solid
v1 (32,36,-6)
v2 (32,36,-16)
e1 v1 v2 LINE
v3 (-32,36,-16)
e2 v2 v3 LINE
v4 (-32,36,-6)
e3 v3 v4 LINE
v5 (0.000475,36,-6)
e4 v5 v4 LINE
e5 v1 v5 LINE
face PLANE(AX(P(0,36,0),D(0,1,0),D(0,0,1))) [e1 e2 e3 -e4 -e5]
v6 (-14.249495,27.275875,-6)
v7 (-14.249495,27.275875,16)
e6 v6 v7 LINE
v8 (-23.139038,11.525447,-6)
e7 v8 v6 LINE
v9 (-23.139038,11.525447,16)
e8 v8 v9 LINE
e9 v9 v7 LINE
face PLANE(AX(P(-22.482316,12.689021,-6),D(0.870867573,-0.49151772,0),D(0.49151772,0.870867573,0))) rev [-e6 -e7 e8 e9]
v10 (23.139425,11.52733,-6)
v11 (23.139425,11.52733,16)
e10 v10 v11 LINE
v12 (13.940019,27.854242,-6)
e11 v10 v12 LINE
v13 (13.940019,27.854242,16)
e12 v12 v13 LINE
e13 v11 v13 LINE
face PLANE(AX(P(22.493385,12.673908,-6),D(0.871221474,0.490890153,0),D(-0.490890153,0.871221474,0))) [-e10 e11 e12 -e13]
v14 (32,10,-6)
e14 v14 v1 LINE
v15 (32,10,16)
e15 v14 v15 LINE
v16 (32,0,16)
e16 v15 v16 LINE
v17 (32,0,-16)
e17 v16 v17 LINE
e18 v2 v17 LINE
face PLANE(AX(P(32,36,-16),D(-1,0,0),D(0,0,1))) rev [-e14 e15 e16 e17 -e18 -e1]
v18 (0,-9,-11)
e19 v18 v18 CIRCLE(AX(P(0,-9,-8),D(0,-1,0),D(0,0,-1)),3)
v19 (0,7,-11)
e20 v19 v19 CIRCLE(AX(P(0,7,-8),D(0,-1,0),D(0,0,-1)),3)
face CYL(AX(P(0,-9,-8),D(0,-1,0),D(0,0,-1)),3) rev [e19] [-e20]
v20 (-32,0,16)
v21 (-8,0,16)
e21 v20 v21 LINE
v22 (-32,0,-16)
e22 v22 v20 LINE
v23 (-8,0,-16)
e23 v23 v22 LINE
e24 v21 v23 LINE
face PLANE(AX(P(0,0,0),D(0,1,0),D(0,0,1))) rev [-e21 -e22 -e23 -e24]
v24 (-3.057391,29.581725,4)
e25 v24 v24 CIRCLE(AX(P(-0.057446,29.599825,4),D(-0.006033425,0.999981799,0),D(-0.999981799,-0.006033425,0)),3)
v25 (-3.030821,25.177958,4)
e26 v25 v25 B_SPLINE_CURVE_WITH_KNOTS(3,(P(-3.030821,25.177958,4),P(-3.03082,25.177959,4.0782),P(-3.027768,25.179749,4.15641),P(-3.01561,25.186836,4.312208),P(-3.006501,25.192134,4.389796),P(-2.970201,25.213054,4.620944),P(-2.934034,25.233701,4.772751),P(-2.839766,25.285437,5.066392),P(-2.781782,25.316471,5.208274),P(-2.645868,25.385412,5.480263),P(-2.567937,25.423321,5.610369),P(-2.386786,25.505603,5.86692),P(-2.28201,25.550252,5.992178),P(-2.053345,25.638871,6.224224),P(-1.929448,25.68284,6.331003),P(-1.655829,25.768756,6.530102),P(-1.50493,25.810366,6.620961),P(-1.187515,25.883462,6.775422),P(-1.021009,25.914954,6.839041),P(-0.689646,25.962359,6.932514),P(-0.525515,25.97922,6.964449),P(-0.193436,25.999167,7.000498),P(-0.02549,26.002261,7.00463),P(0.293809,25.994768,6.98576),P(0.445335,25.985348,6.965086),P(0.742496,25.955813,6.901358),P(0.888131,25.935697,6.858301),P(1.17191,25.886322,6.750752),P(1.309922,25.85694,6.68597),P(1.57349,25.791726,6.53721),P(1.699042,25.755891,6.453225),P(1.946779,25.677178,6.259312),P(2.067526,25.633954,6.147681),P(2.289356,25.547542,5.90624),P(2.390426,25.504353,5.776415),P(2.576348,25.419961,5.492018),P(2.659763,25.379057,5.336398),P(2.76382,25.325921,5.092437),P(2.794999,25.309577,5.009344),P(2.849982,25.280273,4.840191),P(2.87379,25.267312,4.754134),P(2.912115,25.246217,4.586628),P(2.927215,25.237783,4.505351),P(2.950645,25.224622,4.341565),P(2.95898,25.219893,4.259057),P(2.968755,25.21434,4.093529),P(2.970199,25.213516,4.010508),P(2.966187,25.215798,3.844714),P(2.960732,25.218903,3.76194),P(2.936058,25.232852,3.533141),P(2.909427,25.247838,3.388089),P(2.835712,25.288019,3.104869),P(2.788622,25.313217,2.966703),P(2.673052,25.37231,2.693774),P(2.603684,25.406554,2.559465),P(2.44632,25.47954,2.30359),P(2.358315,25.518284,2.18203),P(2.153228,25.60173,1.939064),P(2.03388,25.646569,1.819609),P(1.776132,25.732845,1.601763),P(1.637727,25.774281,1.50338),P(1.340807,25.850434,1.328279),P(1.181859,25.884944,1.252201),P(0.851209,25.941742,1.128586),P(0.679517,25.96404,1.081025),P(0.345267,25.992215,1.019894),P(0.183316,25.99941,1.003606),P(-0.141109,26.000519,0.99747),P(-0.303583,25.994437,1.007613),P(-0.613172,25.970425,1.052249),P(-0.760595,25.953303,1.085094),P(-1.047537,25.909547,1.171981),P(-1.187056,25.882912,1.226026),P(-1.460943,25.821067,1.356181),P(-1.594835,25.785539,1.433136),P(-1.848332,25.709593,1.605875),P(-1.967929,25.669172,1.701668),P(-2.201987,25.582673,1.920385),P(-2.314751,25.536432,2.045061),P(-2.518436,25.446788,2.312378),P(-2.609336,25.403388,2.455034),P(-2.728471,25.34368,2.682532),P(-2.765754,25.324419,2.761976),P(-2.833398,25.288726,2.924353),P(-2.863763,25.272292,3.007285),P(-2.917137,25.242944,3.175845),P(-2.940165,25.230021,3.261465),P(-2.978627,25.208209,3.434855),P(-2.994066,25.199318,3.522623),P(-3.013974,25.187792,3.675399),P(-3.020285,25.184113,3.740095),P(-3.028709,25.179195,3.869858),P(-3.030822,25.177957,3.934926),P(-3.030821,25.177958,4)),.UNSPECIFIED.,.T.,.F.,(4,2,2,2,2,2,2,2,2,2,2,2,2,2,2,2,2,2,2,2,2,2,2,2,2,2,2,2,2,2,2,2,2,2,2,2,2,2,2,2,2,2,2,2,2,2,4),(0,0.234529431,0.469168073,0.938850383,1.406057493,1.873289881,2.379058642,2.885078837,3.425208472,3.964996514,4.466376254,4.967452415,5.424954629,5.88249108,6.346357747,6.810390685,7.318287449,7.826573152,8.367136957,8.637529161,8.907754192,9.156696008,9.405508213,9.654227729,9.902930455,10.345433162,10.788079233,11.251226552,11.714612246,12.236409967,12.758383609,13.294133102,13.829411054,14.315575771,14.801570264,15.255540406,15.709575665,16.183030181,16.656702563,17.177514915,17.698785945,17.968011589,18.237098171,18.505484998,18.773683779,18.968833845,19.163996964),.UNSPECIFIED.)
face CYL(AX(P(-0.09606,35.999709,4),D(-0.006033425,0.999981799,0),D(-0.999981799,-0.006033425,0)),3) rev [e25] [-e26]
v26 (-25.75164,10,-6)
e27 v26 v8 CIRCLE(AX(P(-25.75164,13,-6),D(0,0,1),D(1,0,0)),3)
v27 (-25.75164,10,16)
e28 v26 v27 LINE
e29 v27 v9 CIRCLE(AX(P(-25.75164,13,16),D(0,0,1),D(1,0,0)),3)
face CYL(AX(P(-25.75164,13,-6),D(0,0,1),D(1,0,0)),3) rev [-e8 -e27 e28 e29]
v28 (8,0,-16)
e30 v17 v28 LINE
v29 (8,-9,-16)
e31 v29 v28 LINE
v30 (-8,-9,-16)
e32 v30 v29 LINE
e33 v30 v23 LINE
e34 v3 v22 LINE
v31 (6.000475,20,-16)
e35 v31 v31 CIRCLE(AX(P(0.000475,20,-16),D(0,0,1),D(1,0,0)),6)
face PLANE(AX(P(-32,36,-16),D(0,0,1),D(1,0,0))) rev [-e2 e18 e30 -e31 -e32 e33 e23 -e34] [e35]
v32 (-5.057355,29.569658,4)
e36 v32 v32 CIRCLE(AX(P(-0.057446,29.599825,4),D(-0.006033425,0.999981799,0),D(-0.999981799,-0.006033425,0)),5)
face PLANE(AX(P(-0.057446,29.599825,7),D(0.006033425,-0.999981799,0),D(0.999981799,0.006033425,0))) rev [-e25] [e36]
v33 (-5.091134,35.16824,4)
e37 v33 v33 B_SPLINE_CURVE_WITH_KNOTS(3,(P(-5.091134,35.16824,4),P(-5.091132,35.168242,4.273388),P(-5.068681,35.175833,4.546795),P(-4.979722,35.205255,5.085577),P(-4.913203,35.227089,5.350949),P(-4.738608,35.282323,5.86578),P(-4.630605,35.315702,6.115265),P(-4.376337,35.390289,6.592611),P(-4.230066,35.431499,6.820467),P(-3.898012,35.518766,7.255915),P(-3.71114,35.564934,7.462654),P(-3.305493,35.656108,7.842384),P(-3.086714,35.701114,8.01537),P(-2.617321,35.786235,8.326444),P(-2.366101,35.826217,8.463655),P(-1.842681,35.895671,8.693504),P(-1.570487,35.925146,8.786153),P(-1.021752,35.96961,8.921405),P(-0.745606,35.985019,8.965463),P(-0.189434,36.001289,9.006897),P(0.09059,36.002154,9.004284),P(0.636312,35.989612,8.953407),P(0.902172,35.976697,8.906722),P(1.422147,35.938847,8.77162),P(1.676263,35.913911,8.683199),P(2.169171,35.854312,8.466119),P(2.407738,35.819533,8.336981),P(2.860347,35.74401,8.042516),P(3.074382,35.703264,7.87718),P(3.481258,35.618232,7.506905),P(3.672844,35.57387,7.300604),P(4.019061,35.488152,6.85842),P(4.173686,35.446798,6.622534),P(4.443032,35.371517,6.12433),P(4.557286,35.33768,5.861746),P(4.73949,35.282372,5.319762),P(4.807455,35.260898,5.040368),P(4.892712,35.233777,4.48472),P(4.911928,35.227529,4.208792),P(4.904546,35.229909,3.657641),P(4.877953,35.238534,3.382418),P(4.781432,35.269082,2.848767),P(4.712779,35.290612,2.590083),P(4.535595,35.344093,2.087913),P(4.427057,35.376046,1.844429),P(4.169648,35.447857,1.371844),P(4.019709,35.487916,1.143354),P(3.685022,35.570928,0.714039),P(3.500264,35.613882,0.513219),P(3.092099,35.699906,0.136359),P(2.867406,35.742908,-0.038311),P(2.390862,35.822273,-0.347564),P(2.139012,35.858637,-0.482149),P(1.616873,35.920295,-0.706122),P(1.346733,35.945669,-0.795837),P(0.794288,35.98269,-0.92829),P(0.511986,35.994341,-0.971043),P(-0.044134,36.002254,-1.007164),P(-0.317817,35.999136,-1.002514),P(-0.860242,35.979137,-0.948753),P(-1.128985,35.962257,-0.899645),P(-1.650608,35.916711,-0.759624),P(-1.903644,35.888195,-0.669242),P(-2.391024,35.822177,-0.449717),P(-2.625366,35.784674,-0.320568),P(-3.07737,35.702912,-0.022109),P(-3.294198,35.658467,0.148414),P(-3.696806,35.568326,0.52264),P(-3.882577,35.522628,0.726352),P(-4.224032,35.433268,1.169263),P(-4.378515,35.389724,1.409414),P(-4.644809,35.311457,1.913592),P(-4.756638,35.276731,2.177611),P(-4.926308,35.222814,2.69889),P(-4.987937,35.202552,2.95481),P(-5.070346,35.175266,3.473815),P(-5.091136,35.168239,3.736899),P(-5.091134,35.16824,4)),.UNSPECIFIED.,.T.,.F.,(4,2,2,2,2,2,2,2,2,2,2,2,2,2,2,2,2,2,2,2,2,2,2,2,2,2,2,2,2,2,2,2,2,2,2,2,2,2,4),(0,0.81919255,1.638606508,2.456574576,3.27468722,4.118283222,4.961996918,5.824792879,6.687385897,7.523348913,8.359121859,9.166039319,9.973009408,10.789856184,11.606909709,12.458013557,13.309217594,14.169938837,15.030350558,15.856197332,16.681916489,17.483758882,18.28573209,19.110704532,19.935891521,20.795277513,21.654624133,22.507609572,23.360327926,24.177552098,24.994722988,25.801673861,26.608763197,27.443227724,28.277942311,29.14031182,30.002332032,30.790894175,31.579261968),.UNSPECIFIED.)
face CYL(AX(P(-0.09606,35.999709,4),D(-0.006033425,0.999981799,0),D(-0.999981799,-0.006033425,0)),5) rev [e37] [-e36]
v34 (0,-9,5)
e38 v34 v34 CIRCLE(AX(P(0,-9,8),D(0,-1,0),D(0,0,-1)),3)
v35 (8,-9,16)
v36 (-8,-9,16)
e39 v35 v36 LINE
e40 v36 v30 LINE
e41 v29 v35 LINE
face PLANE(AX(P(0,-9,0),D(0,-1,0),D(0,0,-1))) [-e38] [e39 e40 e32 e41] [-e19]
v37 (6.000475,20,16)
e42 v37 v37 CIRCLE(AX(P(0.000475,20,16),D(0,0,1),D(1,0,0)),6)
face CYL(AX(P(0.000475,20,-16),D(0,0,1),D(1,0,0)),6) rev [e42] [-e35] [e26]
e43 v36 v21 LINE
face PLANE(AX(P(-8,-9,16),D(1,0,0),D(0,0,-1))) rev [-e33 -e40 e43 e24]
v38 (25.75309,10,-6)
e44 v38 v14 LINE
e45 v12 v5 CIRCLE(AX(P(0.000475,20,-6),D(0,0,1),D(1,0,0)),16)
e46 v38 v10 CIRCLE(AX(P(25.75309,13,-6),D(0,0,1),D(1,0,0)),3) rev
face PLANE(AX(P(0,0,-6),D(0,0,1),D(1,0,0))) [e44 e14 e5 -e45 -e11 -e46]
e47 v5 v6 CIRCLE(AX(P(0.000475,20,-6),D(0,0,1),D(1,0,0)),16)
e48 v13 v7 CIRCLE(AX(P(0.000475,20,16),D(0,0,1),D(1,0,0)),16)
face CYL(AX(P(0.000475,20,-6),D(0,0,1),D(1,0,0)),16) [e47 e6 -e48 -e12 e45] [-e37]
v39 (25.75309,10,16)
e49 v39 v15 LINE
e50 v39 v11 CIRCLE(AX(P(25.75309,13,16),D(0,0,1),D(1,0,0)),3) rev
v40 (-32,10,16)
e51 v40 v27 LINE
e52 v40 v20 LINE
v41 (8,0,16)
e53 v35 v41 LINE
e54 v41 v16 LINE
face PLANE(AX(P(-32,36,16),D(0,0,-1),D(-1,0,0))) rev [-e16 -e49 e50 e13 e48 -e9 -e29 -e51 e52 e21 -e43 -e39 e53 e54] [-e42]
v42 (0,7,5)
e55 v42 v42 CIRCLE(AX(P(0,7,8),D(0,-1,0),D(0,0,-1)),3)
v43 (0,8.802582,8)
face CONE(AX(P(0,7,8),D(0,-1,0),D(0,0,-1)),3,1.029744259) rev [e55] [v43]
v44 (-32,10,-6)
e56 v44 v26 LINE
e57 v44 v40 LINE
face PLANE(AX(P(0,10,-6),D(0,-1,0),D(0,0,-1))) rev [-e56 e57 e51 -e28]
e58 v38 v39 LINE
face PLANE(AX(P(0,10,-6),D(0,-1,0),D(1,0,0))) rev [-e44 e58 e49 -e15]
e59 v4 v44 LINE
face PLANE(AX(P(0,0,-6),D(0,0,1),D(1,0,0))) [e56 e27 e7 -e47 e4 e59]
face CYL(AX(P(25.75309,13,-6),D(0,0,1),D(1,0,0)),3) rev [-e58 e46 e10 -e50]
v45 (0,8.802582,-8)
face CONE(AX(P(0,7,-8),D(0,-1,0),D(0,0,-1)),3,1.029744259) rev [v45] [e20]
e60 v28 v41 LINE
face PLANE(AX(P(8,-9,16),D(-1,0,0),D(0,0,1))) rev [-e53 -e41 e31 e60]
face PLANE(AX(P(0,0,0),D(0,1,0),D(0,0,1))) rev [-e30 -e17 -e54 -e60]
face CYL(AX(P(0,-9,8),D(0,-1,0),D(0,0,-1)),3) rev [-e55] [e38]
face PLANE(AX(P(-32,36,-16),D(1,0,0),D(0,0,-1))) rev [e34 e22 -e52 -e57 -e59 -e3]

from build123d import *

# Parameters (mm, degrees)
BOSS_EXTRUDE1_DEPTH       = 36
CUT_EXTRUDE6_DEPTH        = 22
SKETCH11_R                = 6.000000000000001
CUT_EXTRUDE7_DEPTH        = 58.827329183593626
SKETCH12_W                = 16
SKETCH12_H                = 32
BOSS_EXTRUDE2_DEPTH       = 9
F_1_0MM_DOWEL_HOLE1_D     = 6
F_1_0MM_DOWEL_HOLE1_DEPTH = 16
F_1_0MM_DOWEL_HOLE1_TIP   = 1.8025818570826808


# Read off the part's stored shape, not the designer's step: CBORE for M6 Hex Socket Head Cap Screw2
with BuildPart() as part:
    # Sketch1 → Boss-Extrude1 (new body)
    with BuildSketch(Plane(origin=(0, 0, 0), x_dir=(1, 0, 0), z_dir=(0, 1, 0))):
        Polygon((-32.000000000000014, 16), (32, 16), (32, -16), (-32.00000000000001, -16), align=None)
    extrude(amount=BOSS_EXTRUDE1_DEPTH)

    # Sketch2 → Cut-Extrude6 (cut)
    with BuildSketch(Plane.XY.offset(16)):
        with BuildLine():
            Line((0.00047501965244123, 36), (-32.00000000000001, 36))
            Line((-32.00000000000001, 36), (-32.00000000000001, 10))
            Line((-32.00000000000001, 10), (-25.751640415984067, 10))
            ThreePointArc((-25.751640415984067, 10), (-24.238970505556754, 10.409280072626942), (-23.139037695662964, 11.5254468386081))
            Line((-23.139037695662964, 11.5254468386081), (-14.249494850462119, 27.275875122834456))
            ThreePointArc((-14.249494850462119, 27.275875122834453), (-8.35374541517065, 33.645768615897694), (0.00047501965243812, 36.00000000705136))
        make_face()
        with BuildLine():
            Line((31.999999999999993, 36), (0.00047501965244123, 36))
            ThreePointArc((0.00047501965243812, 36.00000000705136), (8.07302482579058, 33.814265808302636), (13.940018609128462, 27.85424246049306))
            Line((13.940018609128462, 27.85424246049306), (23.139425445581196, 11.527329539979691))
            ThreePointArc((23.139425445581196, 11.527329539979691), (24.239486779956046, 10.409825162265975), (25.753089868605628, 10))
            Line((25.753089868605628, 10), (32, 10.000000000000002))
            Line((32, 10.000000000000002), (32, 36))
        make_face()
    extrude(amount=-CUT_EXTRUDE6_DEPTH, mode=Mode.SUBTRACT)

    # Sketch11 → Cut-Extrude7 (cut, through all)
    with BuildSketch(Plane.XY.offset(16)):
        with Locations((0.00047501966492051, 20.000000007051366)):
            Circle(SKETCH11_R)
    extrude(amount=-CUT_EXTRUDE7_DEPTH, mode=Mode.SUBTRACT)

    # Sketch12 → Boss-Extrude2 (add)
    with BuildSketch(Plane.XZ):
        Rectangle(SKETCH12_W, SKETCH12_H)
    extrude(amount=BOSS_EXTRUDE2_DEPTH)

    # CBORE for M6 Hex Socket Head Cap Scr 2 → CBORE for M6 Hex Socket Head Cap Screw2 (revolve, cut)
    with BuildSketch(Plane(origin=(0.121141314, 0.00073091, 3.999999998), x_dir=(0.9999817987234716, 0.006033425376210058, 0), z_dir=(0, 0, -1))):
        Polygon((3, -29.599633116), (3, -25.195487191), (0, -25.195487191), (0, -35.999736435), (5, -35.999736435), (5, -29.599633116), align=None)
    revolve(axis=Axis((0.121141314, 0.00073091, 3.999999998), (0.006033425376210058, -0.9999817987234716, 0)), mode=Mode.SUBTRACT)

    # Ø1.0mm Dowel Hole1
    with Locations(Plane(origin=(0, -9, 0), x_dir=(-1, 0, 0), z_dir=(0, -1, 0))):
        with Locations((0, 8), (0, -8)):
            Hole(F_1_0MM_DOWEL_HOLE1_D / 2, depth=F_1_0MM_DOWEL_HOLE1_DEPTH)
            with Locations((0, 0, -(F_1_0MM_DOWEL_HOLE1_DEPTH + F_1_0MM_DOWEL_HOLE1_TIP / 2))):  # 118° drill point
                Cone(0, F_1_0MM_DOWEL_HOLE1_D / 2, F_1_0MM_DOWEL_HOLE1_TIP, mode=Mode.SUBTRACT)


solid = part.part
